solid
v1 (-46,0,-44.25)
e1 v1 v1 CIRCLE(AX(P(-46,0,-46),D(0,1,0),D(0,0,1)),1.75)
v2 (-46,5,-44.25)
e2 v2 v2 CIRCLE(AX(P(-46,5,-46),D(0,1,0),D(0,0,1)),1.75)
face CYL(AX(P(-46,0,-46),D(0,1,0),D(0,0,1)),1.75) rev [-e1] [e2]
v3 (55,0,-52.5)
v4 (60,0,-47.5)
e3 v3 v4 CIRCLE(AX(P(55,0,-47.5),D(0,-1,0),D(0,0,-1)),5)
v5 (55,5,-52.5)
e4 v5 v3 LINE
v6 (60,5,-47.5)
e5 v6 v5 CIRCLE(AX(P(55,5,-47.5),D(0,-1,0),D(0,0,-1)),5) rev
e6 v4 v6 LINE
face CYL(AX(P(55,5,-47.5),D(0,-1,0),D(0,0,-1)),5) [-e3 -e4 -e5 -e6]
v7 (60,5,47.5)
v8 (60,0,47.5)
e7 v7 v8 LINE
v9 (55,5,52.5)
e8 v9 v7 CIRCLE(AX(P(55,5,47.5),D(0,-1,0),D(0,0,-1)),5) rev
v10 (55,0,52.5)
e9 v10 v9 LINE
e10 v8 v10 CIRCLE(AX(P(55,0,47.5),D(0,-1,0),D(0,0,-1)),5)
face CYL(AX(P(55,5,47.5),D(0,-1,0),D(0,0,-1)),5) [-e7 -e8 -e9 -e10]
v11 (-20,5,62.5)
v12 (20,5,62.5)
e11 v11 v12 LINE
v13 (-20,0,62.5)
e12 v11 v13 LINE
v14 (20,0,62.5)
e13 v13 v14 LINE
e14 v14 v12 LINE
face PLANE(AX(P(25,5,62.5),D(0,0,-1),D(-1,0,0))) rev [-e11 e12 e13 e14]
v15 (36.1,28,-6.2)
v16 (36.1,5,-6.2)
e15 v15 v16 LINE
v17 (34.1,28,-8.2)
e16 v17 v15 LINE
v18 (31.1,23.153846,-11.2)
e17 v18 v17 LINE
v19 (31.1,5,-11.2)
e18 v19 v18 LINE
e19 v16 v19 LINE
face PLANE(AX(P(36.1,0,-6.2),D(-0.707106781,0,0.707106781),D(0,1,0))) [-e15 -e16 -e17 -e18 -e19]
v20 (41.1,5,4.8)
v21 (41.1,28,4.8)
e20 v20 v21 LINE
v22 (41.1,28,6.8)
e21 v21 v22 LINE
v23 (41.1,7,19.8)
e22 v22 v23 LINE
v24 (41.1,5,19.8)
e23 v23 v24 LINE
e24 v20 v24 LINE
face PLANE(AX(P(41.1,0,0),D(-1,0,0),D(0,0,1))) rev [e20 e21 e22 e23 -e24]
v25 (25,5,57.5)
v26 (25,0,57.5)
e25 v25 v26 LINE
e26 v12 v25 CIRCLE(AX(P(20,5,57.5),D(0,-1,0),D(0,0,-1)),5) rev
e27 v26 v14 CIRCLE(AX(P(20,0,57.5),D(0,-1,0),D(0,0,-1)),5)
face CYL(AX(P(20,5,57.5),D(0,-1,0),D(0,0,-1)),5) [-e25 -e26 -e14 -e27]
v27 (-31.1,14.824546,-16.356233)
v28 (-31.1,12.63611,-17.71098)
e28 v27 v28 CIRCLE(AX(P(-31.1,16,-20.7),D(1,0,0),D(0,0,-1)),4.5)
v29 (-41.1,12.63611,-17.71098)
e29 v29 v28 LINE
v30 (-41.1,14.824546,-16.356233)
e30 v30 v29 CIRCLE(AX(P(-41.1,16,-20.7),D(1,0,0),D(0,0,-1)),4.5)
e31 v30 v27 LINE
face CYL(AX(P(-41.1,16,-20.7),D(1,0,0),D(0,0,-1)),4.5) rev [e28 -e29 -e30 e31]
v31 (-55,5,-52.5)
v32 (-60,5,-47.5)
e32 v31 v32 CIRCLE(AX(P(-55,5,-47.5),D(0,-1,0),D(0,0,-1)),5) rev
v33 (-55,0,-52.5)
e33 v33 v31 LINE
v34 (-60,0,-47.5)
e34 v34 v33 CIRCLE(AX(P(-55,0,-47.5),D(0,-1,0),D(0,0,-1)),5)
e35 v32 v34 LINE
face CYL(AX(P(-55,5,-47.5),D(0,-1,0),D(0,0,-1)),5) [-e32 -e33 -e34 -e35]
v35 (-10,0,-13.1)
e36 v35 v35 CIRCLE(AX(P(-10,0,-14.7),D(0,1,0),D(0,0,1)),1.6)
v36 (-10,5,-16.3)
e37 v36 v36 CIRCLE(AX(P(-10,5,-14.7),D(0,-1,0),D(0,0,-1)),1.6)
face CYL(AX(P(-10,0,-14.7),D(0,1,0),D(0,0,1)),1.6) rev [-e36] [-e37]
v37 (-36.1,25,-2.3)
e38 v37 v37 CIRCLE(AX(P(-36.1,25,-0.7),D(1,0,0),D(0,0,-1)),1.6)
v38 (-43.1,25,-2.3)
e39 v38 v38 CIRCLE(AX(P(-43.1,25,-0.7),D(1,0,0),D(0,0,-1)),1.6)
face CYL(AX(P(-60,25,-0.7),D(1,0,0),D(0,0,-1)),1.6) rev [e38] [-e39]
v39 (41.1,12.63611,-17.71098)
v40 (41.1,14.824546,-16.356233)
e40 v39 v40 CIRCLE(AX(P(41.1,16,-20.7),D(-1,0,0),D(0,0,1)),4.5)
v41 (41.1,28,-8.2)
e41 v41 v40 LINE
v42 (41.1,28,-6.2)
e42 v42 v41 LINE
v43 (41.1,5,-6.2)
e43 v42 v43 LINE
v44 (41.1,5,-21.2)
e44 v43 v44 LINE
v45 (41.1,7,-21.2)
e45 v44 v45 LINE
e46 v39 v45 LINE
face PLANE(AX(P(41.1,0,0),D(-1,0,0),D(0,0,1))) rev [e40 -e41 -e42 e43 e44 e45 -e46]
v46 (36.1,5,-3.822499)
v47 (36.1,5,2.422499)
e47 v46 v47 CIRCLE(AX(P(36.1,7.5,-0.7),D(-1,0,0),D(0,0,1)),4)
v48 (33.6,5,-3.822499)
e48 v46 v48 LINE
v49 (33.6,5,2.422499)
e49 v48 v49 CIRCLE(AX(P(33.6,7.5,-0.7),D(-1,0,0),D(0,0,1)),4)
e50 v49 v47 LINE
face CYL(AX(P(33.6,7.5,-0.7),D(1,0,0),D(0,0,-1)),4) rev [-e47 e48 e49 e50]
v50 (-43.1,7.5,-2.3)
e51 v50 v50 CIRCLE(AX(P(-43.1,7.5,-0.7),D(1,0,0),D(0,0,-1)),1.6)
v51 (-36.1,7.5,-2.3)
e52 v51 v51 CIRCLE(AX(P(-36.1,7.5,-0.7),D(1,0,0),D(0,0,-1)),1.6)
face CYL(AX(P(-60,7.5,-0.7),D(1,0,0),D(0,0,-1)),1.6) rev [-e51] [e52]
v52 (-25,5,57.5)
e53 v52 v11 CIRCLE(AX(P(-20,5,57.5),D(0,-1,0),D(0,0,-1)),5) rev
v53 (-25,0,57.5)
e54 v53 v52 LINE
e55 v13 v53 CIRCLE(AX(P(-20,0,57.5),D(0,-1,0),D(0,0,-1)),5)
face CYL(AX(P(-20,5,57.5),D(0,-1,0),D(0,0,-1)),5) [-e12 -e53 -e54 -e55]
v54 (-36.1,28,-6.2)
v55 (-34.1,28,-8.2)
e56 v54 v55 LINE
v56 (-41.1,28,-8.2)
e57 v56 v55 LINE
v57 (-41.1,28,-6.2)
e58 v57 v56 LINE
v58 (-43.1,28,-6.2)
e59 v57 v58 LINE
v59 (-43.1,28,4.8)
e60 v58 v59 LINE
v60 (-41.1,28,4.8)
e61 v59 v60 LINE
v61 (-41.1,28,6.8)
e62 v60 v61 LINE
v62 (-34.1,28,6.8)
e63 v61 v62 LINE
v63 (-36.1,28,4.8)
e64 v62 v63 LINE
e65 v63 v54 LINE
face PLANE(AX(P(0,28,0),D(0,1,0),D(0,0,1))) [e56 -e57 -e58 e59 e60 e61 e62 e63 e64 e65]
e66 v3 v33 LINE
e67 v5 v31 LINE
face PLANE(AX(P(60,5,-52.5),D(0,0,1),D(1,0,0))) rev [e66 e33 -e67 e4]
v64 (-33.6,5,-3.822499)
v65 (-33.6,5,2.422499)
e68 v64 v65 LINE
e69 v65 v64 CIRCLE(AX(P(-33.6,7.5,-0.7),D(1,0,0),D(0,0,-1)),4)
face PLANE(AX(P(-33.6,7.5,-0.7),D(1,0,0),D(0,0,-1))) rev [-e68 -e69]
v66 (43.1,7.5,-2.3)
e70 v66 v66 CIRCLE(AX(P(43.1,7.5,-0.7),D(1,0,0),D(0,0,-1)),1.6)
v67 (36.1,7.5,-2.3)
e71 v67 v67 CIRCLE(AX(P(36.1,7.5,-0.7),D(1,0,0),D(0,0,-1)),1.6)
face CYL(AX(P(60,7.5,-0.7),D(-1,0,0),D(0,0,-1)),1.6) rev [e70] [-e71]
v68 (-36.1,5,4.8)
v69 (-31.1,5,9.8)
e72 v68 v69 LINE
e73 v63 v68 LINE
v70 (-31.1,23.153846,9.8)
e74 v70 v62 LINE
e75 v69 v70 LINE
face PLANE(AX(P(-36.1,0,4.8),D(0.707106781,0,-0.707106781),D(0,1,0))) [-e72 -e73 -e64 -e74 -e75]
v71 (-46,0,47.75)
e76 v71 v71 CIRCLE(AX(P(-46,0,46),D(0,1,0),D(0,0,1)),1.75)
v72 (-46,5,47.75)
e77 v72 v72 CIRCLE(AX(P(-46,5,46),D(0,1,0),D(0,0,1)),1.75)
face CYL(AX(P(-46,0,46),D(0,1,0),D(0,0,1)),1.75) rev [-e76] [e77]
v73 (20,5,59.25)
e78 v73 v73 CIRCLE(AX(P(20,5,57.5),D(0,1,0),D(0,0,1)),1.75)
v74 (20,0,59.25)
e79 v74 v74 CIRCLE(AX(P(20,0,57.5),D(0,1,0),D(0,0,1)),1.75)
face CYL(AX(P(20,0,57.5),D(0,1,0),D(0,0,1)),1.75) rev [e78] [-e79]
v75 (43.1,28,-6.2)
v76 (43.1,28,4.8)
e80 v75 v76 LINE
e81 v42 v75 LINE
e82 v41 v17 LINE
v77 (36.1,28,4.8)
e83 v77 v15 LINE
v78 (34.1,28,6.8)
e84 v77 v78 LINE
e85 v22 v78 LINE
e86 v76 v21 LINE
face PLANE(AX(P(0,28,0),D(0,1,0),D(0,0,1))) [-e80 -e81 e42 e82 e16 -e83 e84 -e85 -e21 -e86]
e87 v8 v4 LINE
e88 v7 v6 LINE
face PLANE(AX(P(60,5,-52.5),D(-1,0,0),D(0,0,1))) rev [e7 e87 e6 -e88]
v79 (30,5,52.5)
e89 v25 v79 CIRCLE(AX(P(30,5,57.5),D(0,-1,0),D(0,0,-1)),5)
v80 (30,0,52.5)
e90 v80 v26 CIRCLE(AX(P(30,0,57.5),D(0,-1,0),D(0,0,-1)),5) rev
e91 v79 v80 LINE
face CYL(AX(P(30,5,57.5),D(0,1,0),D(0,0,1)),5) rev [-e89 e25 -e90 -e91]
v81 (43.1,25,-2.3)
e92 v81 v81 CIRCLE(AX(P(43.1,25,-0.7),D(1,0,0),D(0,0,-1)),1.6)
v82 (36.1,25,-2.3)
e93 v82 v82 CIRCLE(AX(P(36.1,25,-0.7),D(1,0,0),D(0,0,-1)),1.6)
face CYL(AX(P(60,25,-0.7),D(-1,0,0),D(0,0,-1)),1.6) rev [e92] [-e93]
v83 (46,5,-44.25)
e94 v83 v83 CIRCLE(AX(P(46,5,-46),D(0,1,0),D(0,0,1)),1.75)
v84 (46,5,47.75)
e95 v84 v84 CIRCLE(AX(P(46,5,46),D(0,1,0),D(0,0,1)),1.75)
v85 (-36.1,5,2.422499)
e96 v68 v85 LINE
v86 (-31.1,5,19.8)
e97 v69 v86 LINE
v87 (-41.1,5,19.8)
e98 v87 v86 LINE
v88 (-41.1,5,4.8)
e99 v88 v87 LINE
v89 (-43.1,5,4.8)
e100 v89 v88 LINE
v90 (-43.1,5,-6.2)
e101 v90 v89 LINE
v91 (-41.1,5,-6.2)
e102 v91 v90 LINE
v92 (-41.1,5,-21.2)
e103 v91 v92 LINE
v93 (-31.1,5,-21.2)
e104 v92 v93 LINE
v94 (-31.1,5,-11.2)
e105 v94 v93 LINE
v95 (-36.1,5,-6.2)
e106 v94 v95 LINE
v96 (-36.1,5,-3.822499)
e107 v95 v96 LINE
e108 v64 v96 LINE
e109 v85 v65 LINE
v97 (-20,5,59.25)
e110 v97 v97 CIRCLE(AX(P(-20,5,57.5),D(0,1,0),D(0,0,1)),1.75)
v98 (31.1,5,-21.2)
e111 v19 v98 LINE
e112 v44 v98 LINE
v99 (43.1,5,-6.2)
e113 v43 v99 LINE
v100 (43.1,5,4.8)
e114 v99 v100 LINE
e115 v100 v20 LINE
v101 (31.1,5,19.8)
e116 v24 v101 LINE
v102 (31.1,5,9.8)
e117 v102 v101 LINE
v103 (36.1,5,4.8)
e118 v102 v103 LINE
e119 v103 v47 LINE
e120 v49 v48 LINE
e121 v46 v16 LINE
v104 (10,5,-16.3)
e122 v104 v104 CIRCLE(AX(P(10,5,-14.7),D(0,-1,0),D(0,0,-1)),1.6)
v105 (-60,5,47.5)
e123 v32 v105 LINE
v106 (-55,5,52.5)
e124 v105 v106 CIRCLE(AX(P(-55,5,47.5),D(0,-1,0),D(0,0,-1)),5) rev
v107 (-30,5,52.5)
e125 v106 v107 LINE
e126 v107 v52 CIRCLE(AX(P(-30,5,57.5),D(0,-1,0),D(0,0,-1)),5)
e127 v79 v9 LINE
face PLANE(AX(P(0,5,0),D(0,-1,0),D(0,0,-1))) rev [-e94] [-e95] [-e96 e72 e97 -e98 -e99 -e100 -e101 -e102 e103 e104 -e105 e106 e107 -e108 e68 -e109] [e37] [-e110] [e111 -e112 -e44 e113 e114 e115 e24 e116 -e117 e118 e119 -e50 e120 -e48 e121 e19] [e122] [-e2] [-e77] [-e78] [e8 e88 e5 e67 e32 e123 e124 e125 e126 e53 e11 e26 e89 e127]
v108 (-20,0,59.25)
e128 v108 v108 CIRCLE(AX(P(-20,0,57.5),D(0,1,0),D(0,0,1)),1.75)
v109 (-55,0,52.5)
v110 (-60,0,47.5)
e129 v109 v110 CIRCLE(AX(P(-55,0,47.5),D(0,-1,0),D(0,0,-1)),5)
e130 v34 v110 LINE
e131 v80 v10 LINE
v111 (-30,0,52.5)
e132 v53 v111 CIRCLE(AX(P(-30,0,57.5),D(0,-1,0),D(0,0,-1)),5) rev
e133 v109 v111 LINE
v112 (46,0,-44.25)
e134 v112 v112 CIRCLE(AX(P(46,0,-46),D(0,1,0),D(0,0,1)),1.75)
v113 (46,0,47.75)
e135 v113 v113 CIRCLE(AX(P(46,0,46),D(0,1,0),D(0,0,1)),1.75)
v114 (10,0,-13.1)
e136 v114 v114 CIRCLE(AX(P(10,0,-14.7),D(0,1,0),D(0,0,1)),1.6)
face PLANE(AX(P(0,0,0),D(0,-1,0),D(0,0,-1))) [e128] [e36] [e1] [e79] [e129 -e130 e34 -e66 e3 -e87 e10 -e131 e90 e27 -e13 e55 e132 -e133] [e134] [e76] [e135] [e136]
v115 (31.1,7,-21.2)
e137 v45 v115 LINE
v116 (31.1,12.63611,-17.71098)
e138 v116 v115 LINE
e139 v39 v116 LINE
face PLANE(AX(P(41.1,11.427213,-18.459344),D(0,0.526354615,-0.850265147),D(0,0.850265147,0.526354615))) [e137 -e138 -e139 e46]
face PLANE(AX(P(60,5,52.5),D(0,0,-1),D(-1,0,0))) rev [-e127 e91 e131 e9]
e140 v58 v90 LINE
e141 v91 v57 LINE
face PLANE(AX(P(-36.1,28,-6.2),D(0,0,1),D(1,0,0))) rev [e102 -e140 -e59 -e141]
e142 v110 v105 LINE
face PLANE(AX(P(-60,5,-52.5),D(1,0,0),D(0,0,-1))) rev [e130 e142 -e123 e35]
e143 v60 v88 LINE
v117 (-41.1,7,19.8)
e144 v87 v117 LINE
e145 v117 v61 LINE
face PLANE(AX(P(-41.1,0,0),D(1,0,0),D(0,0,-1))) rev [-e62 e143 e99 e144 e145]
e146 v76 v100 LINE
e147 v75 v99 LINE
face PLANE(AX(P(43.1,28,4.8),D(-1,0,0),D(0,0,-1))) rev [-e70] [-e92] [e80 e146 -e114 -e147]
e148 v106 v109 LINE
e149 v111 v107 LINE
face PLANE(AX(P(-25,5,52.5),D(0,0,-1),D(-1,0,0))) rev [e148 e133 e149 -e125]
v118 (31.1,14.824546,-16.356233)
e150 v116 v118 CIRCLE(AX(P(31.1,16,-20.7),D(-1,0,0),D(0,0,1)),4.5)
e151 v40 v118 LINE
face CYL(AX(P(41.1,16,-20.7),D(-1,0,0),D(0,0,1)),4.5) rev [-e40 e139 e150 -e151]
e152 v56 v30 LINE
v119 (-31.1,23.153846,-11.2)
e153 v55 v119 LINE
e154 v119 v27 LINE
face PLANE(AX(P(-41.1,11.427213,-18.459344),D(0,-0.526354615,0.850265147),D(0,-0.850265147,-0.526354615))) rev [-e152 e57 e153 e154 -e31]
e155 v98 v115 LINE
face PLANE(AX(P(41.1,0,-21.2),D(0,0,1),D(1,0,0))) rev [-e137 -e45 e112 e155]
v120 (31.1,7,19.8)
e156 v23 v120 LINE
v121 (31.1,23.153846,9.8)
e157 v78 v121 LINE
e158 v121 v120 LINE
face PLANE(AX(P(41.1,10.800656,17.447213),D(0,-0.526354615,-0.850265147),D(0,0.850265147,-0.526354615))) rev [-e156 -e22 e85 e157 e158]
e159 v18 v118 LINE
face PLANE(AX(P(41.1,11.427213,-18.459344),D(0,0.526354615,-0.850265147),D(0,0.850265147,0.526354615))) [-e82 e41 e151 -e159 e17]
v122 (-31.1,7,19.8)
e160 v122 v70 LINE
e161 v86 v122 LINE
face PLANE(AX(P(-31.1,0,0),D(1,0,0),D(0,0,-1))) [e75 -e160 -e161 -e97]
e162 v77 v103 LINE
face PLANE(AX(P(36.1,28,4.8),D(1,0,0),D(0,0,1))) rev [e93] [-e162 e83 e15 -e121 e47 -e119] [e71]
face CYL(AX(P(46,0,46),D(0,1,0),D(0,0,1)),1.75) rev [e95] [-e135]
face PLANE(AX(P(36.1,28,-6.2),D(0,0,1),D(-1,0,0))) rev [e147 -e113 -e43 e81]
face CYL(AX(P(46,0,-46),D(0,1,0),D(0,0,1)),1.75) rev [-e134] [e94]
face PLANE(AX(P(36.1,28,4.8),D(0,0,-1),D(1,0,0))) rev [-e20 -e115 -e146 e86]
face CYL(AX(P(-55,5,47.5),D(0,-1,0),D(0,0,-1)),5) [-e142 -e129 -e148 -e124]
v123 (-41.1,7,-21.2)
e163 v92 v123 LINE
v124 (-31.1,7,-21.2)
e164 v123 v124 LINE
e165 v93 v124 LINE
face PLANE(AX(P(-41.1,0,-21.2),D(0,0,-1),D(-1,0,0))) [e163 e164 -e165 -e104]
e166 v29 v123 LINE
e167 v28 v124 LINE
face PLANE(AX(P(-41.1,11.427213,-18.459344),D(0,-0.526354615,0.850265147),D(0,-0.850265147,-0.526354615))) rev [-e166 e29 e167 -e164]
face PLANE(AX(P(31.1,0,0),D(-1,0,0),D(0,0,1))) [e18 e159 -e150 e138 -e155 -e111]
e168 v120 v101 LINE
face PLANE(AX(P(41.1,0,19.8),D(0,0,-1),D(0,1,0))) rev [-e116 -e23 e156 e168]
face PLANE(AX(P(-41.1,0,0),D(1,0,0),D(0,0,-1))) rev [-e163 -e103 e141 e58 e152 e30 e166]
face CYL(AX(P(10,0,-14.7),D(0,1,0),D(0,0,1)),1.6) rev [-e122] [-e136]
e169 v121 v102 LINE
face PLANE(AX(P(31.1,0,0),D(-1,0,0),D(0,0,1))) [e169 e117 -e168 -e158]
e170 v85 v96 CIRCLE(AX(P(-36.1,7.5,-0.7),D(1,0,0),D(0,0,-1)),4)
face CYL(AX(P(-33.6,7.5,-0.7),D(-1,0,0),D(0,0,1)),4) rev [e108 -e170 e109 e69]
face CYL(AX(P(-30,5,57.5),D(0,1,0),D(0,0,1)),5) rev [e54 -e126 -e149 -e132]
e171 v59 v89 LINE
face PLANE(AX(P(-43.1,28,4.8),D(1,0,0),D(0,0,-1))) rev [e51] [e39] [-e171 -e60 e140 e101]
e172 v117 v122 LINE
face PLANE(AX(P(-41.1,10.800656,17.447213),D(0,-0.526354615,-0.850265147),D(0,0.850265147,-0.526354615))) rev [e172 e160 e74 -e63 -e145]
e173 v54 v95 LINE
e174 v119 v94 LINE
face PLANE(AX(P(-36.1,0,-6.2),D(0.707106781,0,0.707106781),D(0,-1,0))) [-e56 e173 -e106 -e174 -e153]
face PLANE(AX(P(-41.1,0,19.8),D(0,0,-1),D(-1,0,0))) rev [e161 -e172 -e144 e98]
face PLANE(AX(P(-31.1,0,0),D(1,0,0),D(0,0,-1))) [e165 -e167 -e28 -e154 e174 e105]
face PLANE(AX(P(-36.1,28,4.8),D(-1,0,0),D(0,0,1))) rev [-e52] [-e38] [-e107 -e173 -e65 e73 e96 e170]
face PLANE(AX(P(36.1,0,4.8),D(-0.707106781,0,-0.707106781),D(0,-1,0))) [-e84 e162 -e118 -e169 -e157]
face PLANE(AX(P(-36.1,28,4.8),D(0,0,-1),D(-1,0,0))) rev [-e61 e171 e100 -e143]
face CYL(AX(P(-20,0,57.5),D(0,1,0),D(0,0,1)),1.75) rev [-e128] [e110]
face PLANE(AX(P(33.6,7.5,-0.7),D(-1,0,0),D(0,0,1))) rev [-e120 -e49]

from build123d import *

# Parameters (mm, degrees)
EXTRUDE_1_DEPTH         = 5
FILLET_1_R              = 5
SKETCH_2_W              = 7
SKETCH_2_H              = 11
EXTRUDE_2_DEPTH         = 23
SKETCH_3_R              = 1.6
CUT_EXTRUDE_1_DEPTH     = 119.006186279
SKETCH_5_R              = 1.75
CUT_EXTRUDE_3_DEPTH     = 90.639556001
SKETCH_6_R              = 1.75
CUT_EXTRUDE_4_DEPTH     = 90.639556001
SKETCH2_R               = 4
CUT_EXTRUDE1_DEPTH      = 2.5
CUT_EXTRUDE2_START      = 2.5
SKETCH3_R               = 4
CUT_EXTRUDE2_DEPTH      = 2.5
CUT_EXTRUDE3_DEPTH      = 90.639556001
CUT_EXTRUDE3_DEPTH_BACK = 90.639556001
SKETCH4_R               = 1.6
EXTRUDE_4_DEPTH         = 5
EXTRUDE_4_DEPTH_BACK    = 5
EXTRUDE_5_DEPTH         = 5
EXTRUDE_5_DEPTH_BACK    = 5
CHAMFER_1_SIZE          = 5
SKETCH_12_R             = 1.6
EXTRUDE_6_DEPTH         = 5


with BuildPart() as part:
    # 스케치1 → 보스-돌출1 (new body)
    with BuildSketch(Plane(origin=(0, 0, 0), x_dir=(1, 0, 0), z_dir=(0, 1, 0))):
        Polygon((-25, -52.5), (-60, -52.5), (-60, 52.5), (60, 52.5), (60, -52.5), (25, -52.5), (25, -62.5), (-25, -62.5), align=None)
    extrude(amount=EXTRUDE_1_DEPTH)

    # 필렛1
    fillet_1_edges = [part.edges().sort_by_distance(p)[0] for p in [
        (60, 2.5, -52.5),
        (60, 2.5, 52.5),
        (-60, 2.5, -52.5),
        (-60, 2.5, 52.5),
        (-25, 2.5, 52.5),
        (25, 2.5, 52.5),
        (25, 2.5, 62.5),
        (-25, 2.5, 62.5),
    ]]
    fillet(fillet_1_edges, radius=FILLET_1_R - 0.0001)  # a hair under: the kernel refuses the full size

    # 스케치5 → 컷-돌출3 (cut, through all)
    with BuildSketch(Plane(origin=(0, 5, 0), x_dir=(1, 0, 0), z_dir=(0, 1, 0))):
        with Locations(Location((-46, -46, 0), (0, 0, 270))):
            Circle(SKETCH_5_R)
        with Locations(Location((-46, 46, 0), (0, 0, 270))):
            Circle(SKETCH_5_R)
        with Locations(Location((46, 46, 0), (0, 0, 270))):
            Circle(SKETCH_5_R)
        with Locations(Location((46, -46, 0), (0, 0, 270))):
            Circle(SKETCH_5_R)
    extrude(amount=-CUT_EXTRUDE_3_DEPTH, mode=Mode.SUBTRACT)

    # 스케치6 → 컷-돌출4 (cut, through all)
    with BuildSketch(Plane(origin=(0, 5, 0), x_dir=(1, 0, 0), z_dir=(0, 1, 0))):
        with Locations(Location((20, -57.5, 0), (0, 0, 270))):
            Circle(SKETCH_6_R)
        with Locations(Location((-20, -57.5, 0), (0, 0, 270))):
            Circle(SKETCH_6_R)
    extrude(amount=-CUT_EXTRUDE_4_DEPTH, mode=Mode.SUBTRACT)

    # Sketch2 → Cut-Extrude1 (cut)
    with BuildSketch(Plane.ZY.offset(-36.1)):
        with Locations((-0.7, 7.5)):
            Circle(SKETCH2_R)
    extrude(amount=CUT_EXTRUDE1_DEPTH, mode=Mode.SUBTRACT)

    # Sketch3 → Cut-Extrude2 (cut)
    with BuildSketch(Plane(origin=(-36.1, 0, 0), x_dir=(0, 0, -1), z_dir=(1, 0, 0)).offset(CUT_EXTRUDE2_START)):
        with Locations((0.7, 7.5)):
            Circle(SKETCH3_R)
    extrude(amount=-CUT_EXTRUDE2_DEPTH, mode=Mode.SUBTRACT)

    # Sketch4 → Cut-Extrude3 (cut, two sides: drawn at the far end of the back side and taken through both)
    with BuildSketch(Plane(origin=(0, 5, 0), x_dir=(1, 0, 0), z_dir=(0, 1, 0)).offset(-CUT_EXTRUDE3_DEPTH_BACK)):
        with Locations(Location((-10, 0, 0), (0, 0, 270))):
            Circle(SKETCH4_R)
        with Locations(Location((10, 0, 0), (0, 0, 270))):
            Circle(SKETCH4_R)
        with Locations(Location((-10, 14.7, 0), (0, 0, 270))):
            Circle(SKETCH4_R)
        with Locations(Location((10, 14.7, 0), (0, 0, 270))):
            Circle(SKETCH4_R)
    extrude(amount=CUT_EXTRUDE3_DEPTH + CUT_EXTRUDE3_DEPTH_BACK, mode=Mode.SUBTRACT)



with BuildPart() as body_2:
    # 스케치2 → 보스-돌출2 (new body)
    with BuildSketch(Plane(origin=(0, 5, 0), x_dir=(1, 0, 0), z_dir=(0, 1, 0))):
        with Locations((-39.6, 0.7)):
            Rectangle(SKETCH_2_W, SKETCH_2_H)
    extrude(amount=EXTRUDE_2_DEPTH)

    # 스케치3 → 컷-돌출1 (cut, through all)
    with BuildSketch(Plane(origin=(-36.1, 0, 0), x_dir=(0, 0, -1), z_dir=(1, 0, 0))):
        with Locations((0.7, 25)):
            Circle(SKETCH_3_R)
        with Locations((0.7, 7.5)):
            Circle(SKETCH_3_R)
    extrude(amount=-CUT_EXTRUDE_1_DEPTH, mode=Mode.SUBTRACT)


with BuildPart() as body_3:
    # 대칭 복사1: mirrored copy
    add(body_2.part.mirror(Plane(origin=(0, 0, 0), x_dir=(0, 0, 1), z_dir=(1, 0, 0))))


with BuildPart() as part_1:
    add(part.part)

    add(body_2.part)  # 보스-돌출4 merges body 2
    # 스케치9 → 보스-돌출4 (add, two sides: drawn at the far end of the back side and taken through both)
    with BuildSketch(Plane(origin=(-36.1, 0, 0), x_dir=(0, 0, -1), z_dir=(1, 0, 0)).offset(-EXTRUDE_4_DEPTH_BACK)):
        Polygon((-19.8, 5), (-4.8, 5), (-4.8, 28), (-6.8, 28), (-19.8, 7), align=None)
        with BuildLine():
            Line((16.356233456, 14.824545956), (8.2, 28))
            Line((8.2, 28), (6.2, 28))
            Line((6.2, 28), (6.2, 5))
            Line((6.2, 5), (21.2, 5))
            Line((21.2, 5), (21.2, 7))
            Line((21.2, 7), (17.710979659, 12.636109782))
            ThreePointArc((17.710979659, 12.636109782), (16.87380684, 13.631404234), (16.356233456, 14.824545956))
        make_face()
    extrude(amount=EXTRUDE_4_DEPTH + EXTRUDE_4_DEPTH_BACK)


    add(body_3.part)  # 보스-돌출5 merges body 3
    # 스케치10 → 보스-돌출5 (add, two sides: drawn at the far end of the back side and taken through both)
    with BuildSketch(Plane.ZY.offset(-36.1).offset(-EXTRUDE_5_DEPTH_BACK)):
        with BuildLine():
            Line((-21.2, 5), (-6.2, 5))
            Line((-6.2, 5), (-6.2, 28))
            Line((-6.2, 28), (-8.2, 28))
            Line((-8.2, 28), (-16.356233456, 14.824545956))
            ThreePointArc((-16.356233456, 14.824545956), (-16.87380684, 13.631404234), (-17.710979659, 12.636109782))
            Line((-17.710979659, 12.636109782), (-21.2, 7))
            Line((-21.2, 7), (-21.2, 5))
        make_face()
        Polygon((6.8, 28), (4.8, 28), (4.8, 5), (19.8, 5), (19.8, 7), align=None)
    extrude(amount=EXTRUDE_5_DEPTH + EXTRUDE_5_DEPTH_BACK)

    # 모따기1
    chamfer_1_edges = [part_1.edges().sort_by_distance(p)[0] for p in [
        (31.1, 16.5, 4.8),
        (31.1, 16.5, -6.2),
        (-31.1, 16.5, 4.8),
        (-31.1, 16.5, -6.2),
    ]]
    chamfer(chamfer_1_edges, length=CHAMFER_1_SIZE - 0.0001)  # a hair under: the kernel refuses the full size

    # 스케치12 → 보스-돌출6 (add)
    with BuildSketch(Plane(origin=(0, 5, 0), x_dir=(1, 0, 0), z_dir=(0, 1, 0))):
        with Locations((-10, 0)):
            Circle(SKETCH_12_R)
        with Locations((10, 0)):
            Circle(SKETCH_12_R)
    extrude(amount=-EXTRUDE_6_DEPTH)


solid = part_1.part
